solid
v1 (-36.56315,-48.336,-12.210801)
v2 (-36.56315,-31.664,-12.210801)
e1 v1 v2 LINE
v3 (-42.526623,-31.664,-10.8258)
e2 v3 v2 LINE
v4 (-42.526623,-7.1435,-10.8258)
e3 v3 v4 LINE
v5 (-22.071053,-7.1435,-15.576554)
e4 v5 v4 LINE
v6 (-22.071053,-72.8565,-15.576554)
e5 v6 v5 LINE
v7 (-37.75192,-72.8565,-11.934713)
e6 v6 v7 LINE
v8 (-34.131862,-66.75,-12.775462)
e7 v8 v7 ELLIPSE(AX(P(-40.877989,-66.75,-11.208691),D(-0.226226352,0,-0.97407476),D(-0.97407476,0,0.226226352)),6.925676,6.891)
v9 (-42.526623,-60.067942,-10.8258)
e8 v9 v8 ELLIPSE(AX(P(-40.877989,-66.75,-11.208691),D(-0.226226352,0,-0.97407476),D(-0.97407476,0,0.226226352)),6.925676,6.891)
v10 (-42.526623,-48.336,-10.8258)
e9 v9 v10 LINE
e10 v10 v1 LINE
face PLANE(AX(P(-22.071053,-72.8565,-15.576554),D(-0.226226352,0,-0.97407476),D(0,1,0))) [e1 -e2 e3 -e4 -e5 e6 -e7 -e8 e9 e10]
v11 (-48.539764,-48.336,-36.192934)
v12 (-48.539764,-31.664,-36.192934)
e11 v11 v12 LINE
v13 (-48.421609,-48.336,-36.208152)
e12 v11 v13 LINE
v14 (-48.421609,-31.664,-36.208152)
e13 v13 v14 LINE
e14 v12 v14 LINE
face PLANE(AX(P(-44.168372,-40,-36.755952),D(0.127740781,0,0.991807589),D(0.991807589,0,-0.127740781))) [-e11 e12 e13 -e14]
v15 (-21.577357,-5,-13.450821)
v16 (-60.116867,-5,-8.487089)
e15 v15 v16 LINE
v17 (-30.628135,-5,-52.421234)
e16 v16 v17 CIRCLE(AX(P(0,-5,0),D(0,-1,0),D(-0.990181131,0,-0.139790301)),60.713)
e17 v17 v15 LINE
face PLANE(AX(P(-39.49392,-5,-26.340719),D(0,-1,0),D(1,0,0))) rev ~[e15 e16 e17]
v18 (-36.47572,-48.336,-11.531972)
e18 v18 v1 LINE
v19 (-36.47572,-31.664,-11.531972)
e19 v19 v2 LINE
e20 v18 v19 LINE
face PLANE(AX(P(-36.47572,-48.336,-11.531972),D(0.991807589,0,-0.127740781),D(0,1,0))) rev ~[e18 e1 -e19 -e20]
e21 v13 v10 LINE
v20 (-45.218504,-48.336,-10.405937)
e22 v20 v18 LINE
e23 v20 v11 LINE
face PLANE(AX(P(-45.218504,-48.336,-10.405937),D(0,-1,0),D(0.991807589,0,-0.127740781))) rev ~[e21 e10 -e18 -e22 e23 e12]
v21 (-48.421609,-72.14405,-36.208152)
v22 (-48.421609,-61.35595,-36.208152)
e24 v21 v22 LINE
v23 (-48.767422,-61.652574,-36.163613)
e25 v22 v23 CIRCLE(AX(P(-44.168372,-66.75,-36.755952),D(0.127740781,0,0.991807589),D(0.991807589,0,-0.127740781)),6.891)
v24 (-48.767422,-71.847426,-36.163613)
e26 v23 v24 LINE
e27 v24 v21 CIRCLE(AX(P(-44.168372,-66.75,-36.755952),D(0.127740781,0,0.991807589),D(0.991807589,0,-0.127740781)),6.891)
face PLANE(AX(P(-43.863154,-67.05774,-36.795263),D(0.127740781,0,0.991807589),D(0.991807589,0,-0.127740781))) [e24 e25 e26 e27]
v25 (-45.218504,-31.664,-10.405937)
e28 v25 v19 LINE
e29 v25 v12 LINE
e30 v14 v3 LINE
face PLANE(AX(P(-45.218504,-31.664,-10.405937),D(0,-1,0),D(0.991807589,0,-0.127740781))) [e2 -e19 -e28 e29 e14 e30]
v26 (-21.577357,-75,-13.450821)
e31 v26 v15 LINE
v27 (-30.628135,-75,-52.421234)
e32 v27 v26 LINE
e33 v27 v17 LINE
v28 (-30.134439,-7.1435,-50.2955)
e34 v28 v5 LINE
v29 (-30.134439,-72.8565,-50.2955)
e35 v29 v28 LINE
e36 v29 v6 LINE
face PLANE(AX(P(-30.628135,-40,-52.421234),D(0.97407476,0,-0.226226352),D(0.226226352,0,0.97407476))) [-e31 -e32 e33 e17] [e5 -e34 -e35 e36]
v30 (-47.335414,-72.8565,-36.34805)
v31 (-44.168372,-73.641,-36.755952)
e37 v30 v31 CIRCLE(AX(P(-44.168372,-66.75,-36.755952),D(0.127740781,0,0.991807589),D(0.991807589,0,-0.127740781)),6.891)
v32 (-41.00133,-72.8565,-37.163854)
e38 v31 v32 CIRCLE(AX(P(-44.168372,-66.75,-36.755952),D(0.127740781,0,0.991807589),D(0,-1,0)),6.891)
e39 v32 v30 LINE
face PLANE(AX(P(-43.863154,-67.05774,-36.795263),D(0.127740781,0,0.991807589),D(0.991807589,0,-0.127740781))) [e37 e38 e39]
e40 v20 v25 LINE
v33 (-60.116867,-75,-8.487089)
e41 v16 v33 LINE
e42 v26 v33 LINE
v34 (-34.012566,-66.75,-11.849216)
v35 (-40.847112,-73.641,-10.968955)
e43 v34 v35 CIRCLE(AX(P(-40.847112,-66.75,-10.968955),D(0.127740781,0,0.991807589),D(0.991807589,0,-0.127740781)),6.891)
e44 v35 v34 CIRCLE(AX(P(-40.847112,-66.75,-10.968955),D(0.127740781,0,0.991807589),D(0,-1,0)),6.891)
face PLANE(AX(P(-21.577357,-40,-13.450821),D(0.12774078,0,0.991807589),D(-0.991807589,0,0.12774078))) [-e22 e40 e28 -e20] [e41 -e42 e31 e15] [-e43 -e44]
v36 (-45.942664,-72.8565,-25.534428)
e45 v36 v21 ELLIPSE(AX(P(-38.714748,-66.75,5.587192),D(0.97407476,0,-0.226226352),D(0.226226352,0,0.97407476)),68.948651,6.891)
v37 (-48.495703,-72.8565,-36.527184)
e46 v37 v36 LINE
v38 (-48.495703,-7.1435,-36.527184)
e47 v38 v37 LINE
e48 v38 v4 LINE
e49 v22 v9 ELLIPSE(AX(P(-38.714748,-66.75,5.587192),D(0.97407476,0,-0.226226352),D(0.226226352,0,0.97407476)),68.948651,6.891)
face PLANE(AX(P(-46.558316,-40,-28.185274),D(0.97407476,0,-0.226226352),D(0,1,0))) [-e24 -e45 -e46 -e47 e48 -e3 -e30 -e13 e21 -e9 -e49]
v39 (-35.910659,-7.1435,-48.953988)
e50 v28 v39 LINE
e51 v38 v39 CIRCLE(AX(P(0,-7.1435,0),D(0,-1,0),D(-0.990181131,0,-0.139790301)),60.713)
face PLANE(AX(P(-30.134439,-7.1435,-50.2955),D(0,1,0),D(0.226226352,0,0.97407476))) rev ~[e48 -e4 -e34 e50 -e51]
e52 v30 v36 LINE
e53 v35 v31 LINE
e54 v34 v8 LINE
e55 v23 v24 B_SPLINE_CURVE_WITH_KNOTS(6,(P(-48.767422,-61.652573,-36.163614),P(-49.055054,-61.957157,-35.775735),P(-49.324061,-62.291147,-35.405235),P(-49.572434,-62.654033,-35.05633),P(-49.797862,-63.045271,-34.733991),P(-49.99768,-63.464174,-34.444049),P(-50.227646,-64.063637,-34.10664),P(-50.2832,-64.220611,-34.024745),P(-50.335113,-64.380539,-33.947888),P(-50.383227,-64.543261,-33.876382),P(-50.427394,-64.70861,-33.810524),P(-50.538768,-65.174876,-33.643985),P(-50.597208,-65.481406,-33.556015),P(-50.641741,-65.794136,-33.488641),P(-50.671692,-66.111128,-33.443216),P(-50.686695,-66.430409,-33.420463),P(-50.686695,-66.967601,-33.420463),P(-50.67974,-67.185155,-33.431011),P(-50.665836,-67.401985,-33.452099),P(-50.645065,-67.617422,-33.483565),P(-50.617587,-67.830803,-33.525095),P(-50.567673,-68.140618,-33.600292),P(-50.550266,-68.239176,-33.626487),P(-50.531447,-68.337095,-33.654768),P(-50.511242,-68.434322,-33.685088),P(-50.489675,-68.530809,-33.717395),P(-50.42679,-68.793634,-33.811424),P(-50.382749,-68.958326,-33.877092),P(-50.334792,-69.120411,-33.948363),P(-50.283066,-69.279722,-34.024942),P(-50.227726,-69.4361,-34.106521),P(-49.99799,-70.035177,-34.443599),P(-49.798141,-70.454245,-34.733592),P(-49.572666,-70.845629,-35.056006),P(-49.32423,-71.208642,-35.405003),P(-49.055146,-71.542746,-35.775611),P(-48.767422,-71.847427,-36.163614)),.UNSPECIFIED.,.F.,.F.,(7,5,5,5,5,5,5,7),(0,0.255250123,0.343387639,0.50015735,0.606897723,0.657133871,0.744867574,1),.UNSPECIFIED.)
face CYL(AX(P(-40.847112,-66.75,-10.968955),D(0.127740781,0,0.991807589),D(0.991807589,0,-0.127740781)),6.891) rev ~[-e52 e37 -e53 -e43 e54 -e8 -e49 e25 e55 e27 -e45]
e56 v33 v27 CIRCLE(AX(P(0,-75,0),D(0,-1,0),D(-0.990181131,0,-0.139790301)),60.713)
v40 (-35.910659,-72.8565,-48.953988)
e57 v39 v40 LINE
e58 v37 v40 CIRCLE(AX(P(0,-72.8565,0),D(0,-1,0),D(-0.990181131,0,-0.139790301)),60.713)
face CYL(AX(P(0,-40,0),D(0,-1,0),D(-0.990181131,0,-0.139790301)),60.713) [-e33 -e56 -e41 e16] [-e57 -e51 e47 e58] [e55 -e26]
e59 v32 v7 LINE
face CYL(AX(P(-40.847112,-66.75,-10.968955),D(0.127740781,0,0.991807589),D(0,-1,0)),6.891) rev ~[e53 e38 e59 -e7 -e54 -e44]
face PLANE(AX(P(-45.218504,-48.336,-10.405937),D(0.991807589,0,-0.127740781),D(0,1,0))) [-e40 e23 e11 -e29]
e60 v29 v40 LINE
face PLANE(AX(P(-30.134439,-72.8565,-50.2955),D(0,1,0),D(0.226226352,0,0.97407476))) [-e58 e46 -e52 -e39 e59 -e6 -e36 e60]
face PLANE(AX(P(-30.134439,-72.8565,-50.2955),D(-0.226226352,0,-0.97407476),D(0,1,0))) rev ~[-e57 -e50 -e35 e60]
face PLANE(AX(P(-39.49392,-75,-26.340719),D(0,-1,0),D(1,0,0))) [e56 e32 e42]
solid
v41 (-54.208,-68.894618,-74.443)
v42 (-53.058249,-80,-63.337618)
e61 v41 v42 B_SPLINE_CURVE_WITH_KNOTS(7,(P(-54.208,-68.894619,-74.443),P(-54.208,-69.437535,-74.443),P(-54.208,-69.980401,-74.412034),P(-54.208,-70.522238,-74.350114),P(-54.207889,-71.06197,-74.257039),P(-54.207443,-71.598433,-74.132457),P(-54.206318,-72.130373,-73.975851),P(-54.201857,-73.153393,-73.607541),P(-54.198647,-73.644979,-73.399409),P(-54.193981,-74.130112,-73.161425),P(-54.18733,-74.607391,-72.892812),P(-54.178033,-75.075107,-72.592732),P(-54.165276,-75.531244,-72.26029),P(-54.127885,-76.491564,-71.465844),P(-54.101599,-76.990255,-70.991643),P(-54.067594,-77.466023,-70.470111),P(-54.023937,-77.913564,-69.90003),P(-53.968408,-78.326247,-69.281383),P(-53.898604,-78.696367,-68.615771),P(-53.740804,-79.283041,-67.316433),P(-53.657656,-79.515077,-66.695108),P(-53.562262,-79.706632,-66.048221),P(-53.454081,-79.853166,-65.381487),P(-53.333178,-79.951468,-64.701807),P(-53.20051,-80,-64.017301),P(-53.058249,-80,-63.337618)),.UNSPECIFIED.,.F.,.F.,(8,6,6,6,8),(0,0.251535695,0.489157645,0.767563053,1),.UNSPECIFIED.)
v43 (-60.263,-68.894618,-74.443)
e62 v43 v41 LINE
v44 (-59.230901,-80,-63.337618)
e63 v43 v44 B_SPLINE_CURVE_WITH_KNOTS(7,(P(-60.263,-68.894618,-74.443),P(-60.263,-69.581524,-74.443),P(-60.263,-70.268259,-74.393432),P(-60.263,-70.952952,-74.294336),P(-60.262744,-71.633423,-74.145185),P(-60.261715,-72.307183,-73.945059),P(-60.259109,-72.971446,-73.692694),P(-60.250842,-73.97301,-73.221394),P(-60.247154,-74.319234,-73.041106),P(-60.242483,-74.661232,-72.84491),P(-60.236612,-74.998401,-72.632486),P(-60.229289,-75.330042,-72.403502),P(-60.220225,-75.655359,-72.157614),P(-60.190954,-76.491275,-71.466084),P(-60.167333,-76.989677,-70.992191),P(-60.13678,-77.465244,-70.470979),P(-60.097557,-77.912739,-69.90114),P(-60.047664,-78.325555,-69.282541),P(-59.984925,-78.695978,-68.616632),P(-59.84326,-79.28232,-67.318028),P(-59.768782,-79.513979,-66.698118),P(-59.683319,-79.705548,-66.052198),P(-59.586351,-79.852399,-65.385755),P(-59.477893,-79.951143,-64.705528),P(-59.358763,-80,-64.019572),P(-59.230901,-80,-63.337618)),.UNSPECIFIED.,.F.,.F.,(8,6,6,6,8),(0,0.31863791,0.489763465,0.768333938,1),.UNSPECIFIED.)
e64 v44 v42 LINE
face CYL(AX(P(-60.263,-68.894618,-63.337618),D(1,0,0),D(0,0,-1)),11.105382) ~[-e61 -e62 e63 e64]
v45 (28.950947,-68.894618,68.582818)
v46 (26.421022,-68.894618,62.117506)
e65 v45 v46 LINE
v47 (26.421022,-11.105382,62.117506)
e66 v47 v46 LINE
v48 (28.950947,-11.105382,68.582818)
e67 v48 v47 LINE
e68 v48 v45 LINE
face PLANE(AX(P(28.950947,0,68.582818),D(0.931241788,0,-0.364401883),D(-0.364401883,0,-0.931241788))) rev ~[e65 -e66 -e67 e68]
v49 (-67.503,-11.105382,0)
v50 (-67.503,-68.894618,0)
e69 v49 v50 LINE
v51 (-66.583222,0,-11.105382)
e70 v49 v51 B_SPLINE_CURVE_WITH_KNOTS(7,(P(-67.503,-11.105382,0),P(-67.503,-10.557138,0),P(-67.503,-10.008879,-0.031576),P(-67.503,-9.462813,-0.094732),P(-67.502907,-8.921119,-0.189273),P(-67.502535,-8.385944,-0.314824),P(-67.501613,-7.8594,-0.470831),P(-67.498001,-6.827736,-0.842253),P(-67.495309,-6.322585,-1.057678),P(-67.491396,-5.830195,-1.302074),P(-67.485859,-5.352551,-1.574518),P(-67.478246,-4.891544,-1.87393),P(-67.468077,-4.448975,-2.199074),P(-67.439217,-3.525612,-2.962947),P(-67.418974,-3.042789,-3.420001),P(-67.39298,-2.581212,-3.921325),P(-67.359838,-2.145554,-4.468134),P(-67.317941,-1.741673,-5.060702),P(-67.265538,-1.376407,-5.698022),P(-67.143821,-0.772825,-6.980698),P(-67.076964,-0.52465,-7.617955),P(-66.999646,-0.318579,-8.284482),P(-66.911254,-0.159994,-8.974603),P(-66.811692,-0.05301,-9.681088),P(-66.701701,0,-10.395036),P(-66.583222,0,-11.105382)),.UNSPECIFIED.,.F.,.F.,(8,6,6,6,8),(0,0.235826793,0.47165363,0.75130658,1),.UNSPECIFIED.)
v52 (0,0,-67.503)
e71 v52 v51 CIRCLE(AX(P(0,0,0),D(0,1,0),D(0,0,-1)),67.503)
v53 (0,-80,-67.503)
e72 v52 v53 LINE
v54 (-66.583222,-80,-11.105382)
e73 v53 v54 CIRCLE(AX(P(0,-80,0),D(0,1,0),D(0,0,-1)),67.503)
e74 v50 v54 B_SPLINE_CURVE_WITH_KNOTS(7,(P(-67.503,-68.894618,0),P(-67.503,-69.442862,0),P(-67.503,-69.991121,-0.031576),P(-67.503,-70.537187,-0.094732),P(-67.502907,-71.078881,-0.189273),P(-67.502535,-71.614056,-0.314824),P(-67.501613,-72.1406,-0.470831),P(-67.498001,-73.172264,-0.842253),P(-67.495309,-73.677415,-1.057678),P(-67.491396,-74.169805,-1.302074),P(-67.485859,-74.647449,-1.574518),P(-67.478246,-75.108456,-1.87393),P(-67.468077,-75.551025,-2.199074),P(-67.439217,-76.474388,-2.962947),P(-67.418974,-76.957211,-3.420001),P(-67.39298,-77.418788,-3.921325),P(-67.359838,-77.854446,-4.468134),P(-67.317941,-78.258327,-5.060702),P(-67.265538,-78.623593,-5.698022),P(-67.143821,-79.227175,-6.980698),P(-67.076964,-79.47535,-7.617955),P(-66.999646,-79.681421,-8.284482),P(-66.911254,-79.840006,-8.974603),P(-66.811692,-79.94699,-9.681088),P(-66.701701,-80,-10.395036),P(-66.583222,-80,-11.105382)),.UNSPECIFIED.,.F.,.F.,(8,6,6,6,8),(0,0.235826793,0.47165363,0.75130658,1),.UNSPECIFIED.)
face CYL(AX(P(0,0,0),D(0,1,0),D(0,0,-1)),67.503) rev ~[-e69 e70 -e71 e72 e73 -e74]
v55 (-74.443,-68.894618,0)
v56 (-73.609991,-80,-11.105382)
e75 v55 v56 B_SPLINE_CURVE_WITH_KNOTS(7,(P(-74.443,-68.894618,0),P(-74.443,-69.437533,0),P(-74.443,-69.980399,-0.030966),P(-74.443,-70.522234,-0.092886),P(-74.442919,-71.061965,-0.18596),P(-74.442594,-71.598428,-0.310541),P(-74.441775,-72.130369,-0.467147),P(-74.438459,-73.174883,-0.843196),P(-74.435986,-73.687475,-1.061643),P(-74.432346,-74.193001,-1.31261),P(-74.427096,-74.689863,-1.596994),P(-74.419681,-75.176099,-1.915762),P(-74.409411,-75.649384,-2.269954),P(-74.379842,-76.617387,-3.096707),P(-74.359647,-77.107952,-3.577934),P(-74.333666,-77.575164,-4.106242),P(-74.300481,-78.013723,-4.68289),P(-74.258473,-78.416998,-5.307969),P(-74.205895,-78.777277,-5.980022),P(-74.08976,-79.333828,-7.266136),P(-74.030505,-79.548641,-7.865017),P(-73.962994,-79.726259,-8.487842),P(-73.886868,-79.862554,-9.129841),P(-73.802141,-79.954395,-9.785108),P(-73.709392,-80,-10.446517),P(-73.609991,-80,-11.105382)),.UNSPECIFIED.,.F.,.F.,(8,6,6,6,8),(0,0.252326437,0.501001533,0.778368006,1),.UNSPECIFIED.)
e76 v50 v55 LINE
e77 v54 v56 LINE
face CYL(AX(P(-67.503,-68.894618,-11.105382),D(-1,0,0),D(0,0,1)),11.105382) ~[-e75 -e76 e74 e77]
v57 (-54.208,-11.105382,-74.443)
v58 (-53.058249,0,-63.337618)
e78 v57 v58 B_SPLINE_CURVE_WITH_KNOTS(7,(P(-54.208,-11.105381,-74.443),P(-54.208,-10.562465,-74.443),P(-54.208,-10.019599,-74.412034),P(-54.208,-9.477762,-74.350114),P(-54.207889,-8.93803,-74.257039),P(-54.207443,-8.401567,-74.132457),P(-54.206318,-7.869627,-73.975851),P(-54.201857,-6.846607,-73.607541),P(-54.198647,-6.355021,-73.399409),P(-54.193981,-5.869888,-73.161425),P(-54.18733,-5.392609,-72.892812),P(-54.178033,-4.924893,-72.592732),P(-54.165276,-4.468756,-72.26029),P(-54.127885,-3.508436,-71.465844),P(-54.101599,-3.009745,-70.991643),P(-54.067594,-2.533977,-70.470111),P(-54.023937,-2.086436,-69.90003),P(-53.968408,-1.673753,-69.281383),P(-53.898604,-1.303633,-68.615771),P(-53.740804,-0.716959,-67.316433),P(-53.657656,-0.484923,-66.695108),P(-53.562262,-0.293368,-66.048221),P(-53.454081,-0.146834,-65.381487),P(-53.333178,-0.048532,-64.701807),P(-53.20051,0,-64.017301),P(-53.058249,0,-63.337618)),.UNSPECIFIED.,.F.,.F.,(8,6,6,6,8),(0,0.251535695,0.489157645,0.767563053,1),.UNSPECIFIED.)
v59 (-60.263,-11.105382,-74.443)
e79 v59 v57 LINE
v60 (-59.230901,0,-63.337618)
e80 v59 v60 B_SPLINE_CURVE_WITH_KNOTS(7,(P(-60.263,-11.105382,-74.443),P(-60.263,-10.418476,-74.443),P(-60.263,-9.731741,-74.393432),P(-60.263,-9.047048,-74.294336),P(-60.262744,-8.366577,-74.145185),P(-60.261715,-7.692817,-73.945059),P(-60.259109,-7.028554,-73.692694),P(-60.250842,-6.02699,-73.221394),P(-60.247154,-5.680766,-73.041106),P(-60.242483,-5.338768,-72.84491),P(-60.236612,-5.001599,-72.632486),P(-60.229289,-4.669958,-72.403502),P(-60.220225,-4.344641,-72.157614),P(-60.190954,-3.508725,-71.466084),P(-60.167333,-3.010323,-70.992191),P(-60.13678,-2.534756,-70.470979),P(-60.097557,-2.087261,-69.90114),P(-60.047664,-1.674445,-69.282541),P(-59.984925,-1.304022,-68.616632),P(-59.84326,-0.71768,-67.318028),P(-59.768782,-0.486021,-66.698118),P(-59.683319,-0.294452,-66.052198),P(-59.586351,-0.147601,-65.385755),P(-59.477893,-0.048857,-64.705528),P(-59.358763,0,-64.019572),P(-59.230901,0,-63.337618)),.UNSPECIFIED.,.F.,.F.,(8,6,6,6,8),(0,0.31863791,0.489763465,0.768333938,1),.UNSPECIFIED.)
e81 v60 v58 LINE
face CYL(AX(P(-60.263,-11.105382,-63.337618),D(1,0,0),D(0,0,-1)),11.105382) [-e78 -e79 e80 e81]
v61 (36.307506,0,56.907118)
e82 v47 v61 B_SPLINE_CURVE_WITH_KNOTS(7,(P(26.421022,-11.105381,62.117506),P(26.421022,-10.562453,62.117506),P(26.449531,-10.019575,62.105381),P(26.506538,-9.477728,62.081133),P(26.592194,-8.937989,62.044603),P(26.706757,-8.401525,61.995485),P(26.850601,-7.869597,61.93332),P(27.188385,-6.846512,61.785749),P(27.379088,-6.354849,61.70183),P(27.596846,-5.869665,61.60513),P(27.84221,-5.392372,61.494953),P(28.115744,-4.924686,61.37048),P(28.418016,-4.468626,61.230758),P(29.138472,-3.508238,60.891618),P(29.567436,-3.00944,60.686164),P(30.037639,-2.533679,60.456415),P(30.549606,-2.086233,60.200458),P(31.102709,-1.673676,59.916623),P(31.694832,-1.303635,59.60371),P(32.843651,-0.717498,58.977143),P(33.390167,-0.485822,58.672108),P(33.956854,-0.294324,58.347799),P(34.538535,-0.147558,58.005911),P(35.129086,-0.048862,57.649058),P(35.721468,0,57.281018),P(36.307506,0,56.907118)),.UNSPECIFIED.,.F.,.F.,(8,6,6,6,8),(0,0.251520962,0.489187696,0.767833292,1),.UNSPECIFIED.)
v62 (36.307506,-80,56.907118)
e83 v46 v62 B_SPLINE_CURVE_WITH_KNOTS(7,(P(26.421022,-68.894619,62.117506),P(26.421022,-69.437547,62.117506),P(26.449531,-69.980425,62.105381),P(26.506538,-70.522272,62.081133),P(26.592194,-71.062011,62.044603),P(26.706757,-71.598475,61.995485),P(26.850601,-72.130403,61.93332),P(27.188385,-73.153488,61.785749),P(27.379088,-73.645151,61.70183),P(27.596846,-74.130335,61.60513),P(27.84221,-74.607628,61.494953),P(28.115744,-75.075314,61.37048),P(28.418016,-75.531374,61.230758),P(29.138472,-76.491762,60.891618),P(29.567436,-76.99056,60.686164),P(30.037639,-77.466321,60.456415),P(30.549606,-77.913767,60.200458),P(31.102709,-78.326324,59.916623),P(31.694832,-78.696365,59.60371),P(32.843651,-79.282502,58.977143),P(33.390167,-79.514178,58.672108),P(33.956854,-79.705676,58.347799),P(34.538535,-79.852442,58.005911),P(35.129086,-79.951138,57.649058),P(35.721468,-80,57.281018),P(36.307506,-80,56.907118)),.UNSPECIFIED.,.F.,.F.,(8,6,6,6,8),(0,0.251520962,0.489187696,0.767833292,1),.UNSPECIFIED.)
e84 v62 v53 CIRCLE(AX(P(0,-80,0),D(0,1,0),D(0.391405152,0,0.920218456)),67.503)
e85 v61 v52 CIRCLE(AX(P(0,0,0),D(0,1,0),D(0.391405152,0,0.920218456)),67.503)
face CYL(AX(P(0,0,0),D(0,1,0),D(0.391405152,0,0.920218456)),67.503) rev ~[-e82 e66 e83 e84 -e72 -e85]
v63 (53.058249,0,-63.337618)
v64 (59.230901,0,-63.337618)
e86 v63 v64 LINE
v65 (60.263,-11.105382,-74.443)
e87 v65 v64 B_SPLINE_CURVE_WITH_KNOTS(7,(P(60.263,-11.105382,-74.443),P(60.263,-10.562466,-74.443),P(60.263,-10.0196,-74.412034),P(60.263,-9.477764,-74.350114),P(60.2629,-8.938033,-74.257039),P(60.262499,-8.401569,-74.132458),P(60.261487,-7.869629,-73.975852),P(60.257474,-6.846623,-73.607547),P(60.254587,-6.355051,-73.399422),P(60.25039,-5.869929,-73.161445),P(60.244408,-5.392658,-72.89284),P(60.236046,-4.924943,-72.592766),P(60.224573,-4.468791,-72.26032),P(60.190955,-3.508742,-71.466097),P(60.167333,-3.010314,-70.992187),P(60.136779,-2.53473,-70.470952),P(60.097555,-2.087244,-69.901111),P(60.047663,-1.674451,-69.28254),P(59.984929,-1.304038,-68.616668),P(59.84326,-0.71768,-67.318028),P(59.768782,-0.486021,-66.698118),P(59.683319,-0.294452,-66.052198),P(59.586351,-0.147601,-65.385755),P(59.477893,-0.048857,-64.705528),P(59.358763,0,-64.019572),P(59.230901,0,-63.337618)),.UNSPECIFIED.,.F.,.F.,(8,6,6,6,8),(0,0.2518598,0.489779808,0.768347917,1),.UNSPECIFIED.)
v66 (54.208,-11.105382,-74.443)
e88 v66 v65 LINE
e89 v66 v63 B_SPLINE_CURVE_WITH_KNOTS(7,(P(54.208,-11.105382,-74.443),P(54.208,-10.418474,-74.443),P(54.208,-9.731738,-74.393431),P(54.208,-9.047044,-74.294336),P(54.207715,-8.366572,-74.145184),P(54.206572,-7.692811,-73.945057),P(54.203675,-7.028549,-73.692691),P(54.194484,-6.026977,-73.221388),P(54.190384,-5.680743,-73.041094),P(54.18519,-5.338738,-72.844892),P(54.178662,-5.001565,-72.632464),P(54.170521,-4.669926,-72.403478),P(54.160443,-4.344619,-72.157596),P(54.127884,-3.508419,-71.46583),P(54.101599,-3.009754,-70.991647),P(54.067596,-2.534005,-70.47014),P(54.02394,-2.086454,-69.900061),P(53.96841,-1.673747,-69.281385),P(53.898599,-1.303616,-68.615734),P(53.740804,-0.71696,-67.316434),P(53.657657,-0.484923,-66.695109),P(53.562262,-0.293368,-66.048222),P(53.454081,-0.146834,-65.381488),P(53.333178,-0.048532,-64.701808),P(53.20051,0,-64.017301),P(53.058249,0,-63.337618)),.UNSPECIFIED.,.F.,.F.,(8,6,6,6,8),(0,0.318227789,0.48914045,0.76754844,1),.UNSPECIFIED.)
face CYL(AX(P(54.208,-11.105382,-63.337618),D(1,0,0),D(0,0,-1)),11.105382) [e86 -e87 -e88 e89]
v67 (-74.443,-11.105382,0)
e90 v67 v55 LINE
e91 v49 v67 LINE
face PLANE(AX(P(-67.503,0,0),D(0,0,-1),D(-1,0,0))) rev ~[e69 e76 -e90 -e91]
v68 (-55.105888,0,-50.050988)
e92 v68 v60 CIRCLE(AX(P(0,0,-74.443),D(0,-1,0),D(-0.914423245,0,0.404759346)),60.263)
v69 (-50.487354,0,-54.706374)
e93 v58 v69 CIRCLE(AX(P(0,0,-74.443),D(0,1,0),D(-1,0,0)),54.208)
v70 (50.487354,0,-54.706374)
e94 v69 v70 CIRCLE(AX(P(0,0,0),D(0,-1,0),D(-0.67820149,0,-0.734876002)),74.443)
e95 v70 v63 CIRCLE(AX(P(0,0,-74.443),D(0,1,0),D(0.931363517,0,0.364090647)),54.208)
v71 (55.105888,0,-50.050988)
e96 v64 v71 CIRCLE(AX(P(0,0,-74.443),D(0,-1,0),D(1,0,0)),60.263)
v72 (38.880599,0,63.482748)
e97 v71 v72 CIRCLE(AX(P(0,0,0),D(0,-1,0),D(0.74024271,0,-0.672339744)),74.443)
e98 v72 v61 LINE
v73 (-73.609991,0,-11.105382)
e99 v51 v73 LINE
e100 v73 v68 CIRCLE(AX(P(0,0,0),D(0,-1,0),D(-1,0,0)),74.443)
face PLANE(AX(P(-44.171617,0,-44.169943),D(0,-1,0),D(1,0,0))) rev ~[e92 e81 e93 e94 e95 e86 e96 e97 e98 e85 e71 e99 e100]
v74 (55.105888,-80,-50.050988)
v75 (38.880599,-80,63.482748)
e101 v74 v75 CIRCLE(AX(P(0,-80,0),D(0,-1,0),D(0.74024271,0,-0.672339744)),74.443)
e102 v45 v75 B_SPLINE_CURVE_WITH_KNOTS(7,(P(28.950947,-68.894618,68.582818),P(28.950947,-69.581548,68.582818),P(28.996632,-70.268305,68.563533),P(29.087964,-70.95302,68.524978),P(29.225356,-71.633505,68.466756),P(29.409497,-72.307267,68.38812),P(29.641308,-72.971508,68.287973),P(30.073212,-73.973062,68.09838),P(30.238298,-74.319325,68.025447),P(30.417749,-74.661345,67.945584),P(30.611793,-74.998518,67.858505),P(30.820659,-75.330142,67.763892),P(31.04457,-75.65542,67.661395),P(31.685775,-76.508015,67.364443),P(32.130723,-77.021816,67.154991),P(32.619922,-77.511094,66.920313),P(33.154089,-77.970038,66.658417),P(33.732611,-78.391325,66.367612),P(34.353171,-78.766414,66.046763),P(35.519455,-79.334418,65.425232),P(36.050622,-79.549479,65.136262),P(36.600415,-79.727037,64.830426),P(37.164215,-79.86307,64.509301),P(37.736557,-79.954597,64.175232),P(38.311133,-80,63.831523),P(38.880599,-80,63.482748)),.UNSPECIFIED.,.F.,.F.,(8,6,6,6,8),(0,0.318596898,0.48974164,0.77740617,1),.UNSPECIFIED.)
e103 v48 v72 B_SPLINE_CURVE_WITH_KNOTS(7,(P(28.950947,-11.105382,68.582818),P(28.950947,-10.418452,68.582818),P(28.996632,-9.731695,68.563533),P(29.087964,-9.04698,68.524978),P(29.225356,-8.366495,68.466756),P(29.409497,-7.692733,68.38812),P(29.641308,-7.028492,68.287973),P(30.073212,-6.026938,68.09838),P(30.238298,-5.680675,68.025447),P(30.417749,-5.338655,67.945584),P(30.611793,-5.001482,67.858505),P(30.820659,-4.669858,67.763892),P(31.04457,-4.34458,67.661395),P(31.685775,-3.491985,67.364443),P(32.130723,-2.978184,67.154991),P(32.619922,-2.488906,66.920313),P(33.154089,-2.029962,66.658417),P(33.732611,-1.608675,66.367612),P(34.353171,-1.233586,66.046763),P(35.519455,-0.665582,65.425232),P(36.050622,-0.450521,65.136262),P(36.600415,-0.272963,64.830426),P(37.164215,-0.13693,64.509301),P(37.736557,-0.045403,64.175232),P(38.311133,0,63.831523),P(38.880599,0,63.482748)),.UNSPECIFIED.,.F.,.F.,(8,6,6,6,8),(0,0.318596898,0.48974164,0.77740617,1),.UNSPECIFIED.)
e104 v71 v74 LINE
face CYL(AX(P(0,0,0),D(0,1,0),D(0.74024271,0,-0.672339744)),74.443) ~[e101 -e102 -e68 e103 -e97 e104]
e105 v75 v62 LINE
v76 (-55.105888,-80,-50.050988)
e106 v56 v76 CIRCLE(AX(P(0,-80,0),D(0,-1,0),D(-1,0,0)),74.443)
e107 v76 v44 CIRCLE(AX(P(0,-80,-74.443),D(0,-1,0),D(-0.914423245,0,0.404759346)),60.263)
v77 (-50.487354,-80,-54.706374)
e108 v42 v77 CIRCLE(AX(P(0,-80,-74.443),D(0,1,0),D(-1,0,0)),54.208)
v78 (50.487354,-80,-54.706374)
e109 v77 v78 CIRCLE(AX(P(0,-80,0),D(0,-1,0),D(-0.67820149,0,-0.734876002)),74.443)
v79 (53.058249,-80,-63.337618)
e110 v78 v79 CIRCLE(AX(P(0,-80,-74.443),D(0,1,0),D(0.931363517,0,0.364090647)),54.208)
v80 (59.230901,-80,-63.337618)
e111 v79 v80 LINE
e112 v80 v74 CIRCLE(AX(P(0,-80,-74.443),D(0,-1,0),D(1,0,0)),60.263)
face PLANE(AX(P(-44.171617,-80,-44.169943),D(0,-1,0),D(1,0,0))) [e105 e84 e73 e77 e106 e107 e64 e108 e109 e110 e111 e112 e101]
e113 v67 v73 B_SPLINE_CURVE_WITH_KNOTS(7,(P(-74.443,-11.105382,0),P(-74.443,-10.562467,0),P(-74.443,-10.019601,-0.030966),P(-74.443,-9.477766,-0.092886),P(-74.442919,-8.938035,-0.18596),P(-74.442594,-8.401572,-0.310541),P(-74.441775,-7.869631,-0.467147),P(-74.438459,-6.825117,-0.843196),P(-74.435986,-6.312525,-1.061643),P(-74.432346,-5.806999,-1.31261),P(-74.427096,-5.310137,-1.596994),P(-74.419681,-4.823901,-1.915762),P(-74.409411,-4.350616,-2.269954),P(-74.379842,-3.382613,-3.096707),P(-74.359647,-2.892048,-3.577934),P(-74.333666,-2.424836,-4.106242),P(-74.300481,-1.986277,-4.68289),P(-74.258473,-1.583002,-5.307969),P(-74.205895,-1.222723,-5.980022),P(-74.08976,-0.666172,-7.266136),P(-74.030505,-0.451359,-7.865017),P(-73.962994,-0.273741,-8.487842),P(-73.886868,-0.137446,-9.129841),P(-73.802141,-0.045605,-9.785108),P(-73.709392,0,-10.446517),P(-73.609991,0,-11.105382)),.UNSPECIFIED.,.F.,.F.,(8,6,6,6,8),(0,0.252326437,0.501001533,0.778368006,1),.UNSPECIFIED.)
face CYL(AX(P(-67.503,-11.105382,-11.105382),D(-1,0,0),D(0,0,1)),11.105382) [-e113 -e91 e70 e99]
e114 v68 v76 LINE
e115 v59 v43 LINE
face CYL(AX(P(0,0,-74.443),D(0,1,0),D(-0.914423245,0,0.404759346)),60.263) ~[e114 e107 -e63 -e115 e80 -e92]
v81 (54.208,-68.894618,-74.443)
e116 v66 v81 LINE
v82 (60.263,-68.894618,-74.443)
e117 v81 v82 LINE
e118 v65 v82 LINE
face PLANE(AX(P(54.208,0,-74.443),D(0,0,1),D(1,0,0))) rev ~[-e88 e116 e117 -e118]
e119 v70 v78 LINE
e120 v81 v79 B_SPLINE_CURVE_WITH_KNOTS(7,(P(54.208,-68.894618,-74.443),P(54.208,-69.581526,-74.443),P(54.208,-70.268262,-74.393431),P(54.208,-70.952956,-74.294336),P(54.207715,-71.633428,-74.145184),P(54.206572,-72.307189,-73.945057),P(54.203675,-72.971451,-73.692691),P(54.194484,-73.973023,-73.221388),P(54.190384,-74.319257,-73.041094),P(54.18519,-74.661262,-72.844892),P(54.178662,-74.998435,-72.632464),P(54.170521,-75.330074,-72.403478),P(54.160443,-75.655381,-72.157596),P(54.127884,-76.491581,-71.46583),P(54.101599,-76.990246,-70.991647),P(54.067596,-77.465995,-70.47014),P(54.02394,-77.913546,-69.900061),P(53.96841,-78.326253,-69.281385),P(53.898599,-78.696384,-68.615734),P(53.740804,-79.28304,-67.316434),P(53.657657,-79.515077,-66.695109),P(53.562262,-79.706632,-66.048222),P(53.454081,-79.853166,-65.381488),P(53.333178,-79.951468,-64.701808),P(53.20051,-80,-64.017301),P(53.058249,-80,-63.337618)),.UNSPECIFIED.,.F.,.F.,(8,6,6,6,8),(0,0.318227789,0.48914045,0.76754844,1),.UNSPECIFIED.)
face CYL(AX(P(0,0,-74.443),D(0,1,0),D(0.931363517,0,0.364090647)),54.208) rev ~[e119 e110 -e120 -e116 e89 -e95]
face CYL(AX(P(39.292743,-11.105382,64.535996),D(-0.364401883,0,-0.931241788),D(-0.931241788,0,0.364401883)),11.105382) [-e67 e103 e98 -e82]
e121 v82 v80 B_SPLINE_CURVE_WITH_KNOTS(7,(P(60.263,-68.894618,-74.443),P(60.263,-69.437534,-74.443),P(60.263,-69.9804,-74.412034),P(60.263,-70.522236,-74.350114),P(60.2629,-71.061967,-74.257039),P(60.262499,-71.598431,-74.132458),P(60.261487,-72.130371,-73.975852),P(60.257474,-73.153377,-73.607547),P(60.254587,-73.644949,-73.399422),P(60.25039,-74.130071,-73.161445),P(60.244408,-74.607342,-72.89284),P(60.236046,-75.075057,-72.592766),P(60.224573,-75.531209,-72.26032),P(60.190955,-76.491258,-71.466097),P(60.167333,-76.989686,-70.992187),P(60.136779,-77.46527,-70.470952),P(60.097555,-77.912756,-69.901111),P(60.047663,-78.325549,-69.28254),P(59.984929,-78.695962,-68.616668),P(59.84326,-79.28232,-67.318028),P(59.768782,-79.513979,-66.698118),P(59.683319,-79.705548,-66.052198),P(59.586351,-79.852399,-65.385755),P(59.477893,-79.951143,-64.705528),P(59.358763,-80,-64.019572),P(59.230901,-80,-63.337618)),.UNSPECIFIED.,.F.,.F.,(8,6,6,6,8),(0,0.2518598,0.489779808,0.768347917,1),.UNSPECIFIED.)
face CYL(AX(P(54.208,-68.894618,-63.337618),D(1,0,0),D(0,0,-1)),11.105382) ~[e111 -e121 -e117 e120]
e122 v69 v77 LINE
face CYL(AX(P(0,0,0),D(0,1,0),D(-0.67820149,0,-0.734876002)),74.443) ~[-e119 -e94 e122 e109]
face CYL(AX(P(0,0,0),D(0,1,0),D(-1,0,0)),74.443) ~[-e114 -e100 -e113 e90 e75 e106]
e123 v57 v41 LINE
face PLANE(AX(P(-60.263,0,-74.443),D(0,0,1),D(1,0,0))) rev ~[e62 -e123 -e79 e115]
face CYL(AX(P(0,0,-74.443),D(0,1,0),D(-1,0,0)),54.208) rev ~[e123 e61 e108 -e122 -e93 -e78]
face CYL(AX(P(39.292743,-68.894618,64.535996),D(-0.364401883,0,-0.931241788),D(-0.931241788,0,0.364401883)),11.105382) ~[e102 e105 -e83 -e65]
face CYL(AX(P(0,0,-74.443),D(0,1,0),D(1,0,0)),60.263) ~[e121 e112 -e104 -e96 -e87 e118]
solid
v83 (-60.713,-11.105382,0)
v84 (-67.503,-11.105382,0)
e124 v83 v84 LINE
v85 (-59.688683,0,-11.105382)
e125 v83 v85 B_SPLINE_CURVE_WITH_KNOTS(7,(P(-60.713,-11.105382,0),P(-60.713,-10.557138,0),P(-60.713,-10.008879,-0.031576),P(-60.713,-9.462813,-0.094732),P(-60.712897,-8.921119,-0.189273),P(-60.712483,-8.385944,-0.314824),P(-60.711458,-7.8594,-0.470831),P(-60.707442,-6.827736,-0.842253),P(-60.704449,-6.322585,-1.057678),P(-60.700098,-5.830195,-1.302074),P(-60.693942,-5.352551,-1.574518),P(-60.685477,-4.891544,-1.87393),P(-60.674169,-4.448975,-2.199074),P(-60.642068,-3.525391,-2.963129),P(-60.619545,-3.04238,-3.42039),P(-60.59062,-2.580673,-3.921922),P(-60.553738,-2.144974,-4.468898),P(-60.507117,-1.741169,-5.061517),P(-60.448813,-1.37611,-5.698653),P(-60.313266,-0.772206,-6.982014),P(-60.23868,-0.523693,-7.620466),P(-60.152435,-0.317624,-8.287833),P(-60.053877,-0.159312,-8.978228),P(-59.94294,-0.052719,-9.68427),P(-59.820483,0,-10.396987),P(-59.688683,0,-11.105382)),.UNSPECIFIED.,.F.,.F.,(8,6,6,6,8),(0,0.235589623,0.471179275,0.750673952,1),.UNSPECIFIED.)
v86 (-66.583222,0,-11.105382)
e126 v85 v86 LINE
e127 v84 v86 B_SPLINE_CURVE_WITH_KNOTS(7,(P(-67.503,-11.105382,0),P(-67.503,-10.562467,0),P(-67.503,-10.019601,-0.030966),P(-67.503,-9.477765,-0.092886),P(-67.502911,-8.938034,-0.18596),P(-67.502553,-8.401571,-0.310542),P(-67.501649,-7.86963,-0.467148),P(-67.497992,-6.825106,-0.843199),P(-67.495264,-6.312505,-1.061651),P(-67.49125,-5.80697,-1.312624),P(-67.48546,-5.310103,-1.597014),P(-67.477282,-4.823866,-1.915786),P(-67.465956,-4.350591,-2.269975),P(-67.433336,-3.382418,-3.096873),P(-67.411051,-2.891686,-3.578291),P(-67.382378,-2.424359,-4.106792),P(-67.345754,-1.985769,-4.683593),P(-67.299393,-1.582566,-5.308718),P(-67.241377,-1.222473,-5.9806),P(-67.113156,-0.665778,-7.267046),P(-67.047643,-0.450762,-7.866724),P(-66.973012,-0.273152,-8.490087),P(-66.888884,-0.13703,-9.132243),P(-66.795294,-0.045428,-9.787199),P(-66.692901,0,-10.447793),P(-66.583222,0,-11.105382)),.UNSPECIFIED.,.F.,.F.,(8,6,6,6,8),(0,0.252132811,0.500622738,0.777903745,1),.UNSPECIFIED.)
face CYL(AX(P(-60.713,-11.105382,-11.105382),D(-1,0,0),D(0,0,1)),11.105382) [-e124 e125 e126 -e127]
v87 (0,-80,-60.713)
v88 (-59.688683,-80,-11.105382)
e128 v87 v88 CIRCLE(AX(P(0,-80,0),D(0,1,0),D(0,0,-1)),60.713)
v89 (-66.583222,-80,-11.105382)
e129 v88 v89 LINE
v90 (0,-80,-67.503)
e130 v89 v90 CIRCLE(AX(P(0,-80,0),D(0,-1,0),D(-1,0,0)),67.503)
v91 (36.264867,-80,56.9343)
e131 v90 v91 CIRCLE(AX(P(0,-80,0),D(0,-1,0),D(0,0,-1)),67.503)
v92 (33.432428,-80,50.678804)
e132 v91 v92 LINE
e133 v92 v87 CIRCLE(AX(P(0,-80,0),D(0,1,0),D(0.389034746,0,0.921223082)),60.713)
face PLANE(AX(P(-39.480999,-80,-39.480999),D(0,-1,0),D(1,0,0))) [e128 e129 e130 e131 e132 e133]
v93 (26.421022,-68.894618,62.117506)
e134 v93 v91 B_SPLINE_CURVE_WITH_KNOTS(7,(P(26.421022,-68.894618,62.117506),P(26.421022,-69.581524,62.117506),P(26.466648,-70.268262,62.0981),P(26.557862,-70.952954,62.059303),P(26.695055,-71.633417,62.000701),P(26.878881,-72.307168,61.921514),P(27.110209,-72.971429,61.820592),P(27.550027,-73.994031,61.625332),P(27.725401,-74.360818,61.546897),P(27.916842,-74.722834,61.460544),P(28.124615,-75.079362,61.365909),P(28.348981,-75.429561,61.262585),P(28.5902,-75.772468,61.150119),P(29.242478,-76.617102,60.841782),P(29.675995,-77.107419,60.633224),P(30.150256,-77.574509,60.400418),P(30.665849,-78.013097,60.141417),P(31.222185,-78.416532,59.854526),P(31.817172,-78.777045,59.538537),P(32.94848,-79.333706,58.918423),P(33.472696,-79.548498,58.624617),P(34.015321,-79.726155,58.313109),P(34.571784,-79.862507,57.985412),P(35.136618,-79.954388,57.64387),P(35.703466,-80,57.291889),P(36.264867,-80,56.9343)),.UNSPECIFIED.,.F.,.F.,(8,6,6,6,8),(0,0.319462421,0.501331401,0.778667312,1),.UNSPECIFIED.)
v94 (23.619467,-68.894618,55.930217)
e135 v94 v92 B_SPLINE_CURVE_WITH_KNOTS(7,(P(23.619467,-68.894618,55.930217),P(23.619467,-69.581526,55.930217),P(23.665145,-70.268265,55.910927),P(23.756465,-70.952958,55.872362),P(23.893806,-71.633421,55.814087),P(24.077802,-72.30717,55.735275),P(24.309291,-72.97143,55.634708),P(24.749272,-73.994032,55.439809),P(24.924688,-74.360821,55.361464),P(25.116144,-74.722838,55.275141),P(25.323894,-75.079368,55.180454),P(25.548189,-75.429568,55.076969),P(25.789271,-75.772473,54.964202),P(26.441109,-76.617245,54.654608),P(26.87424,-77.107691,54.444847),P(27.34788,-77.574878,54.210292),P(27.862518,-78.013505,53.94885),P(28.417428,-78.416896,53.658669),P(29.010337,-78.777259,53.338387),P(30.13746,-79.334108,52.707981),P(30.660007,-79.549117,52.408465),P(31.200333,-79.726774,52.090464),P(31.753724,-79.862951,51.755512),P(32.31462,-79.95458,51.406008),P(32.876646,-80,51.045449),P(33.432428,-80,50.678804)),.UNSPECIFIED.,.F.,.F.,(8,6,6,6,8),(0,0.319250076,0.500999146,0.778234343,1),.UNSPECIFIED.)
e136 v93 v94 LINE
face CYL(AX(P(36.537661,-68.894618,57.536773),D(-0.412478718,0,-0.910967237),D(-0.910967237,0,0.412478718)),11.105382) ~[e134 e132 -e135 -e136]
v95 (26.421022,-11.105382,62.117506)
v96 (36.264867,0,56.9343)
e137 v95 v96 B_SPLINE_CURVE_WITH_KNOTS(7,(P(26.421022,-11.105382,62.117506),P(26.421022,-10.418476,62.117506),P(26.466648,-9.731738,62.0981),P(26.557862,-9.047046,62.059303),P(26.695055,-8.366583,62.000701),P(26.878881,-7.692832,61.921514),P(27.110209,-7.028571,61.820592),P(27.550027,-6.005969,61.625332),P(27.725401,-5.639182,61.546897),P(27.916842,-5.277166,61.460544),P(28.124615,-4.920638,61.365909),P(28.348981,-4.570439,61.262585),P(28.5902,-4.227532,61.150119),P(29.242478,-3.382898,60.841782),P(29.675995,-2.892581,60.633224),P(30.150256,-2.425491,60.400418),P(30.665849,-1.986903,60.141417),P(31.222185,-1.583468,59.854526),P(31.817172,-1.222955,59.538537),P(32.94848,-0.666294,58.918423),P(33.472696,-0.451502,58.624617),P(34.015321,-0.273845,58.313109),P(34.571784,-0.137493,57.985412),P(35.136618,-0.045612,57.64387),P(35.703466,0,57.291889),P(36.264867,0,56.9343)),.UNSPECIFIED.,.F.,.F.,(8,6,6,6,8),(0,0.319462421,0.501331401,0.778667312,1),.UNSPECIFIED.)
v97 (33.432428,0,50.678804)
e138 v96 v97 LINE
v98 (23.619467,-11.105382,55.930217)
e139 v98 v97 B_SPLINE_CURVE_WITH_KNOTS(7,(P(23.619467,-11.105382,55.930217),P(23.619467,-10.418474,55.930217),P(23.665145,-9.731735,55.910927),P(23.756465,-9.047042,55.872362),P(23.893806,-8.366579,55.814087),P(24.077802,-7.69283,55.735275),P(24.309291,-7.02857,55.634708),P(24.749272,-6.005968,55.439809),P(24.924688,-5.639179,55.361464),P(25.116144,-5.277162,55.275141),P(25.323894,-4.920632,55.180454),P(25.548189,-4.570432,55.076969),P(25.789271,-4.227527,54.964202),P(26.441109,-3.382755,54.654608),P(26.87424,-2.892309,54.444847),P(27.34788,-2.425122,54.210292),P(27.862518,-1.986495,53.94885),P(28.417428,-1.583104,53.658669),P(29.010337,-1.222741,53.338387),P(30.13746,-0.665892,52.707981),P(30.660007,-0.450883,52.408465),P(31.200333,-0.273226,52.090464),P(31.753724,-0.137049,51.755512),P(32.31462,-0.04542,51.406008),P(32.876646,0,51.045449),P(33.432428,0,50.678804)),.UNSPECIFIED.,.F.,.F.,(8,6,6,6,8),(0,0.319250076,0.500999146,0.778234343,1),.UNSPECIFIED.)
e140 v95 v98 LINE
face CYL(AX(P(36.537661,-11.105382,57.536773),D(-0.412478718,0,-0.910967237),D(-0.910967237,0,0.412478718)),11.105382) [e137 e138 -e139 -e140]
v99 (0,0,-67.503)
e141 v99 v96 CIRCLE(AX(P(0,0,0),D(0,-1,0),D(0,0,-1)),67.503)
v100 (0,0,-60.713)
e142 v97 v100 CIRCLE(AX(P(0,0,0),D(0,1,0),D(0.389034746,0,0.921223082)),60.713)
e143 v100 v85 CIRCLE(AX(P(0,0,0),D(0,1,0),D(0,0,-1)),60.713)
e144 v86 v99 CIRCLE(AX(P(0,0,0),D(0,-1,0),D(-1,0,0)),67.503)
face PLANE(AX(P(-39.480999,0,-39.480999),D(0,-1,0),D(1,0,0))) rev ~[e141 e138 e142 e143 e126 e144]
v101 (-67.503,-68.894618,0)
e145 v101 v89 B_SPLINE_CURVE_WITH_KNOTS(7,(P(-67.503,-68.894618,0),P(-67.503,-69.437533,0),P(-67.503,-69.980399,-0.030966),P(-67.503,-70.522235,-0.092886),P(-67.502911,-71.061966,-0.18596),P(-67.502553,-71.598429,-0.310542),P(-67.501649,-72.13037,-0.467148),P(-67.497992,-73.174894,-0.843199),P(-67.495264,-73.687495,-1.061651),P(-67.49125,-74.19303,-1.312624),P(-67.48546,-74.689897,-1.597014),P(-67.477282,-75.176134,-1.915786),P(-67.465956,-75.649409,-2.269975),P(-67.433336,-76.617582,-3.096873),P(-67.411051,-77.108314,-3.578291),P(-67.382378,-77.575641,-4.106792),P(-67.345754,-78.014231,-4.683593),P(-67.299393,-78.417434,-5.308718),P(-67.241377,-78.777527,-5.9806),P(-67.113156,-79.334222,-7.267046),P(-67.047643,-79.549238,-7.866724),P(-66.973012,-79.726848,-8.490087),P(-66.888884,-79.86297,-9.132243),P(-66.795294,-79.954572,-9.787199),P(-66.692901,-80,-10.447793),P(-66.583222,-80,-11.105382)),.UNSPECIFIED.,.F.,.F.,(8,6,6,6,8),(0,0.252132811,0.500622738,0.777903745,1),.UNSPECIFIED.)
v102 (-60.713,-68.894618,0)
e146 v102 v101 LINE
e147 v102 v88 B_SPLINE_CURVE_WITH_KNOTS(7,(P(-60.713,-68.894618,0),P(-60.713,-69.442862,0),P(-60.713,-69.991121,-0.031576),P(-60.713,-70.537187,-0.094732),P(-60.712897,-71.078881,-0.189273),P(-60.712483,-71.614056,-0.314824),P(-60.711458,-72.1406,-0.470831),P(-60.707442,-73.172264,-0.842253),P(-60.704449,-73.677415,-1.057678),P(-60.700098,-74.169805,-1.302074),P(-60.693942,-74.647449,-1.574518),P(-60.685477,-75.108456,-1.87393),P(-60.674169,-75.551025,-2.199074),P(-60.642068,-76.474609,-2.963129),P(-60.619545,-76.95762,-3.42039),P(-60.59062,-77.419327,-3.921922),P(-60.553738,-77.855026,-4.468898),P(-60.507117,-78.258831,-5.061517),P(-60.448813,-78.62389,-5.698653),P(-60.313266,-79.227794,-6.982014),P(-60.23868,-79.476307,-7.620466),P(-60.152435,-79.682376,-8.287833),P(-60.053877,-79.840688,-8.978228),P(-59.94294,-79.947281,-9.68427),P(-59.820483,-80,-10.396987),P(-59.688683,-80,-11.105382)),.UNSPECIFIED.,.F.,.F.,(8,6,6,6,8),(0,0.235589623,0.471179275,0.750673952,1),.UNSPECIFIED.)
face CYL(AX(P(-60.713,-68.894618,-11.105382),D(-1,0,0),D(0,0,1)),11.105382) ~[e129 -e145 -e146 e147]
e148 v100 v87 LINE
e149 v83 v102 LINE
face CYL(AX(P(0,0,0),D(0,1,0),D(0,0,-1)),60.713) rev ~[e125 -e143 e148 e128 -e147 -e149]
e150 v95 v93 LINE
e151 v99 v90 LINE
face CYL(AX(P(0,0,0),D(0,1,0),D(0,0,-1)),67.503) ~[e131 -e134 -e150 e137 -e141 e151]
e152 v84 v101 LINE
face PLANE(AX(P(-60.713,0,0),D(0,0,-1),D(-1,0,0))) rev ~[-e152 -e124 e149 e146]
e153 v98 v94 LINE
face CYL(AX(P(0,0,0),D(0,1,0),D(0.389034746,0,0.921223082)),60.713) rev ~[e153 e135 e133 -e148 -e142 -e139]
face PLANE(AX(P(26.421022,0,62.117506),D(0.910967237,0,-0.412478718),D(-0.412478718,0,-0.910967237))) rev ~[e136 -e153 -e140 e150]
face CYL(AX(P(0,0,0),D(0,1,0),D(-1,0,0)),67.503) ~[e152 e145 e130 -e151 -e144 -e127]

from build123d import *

# Parameters (mm, degrees)
F1_DEPTH      = 80
F2_DEPTH      = 80
F3_R          = 11.1053823869
F3_2_R        = 11.1053823869
F6_DEPTH      = 35
F6_DEPTH_BACK = 35
F8_DEPTH      = 26
F7_W          = 8.815
F7_H          = 16.672
F9_DEPTH      = 26
F10_W         = 65.713
F10_H         = 35.643
F11_DEPTH     = 21


with BuildPart() as f1:
    # F0 (on Front) → F1 (new body)
    with BuildSketch(Plane.XZ):
        with BuildLine():
            Line((0, -67.503), (0, -60.713))
            ThreePointArc((0, -60.713), (-42.9305740062, -42.9305740062), (-60.713, 0))
            Line((-60.713, 0), (-67.503, 0))
            ThreePointArc((-67.503, 0), (-47.7318290504, -47.7318290504), (0, -67.503))
        make_face()
        with BuildLine():
            Line((26.4210219705, 62.1175064457), (23.6194665166, 55.9302169714))
            ThreePointArc((23.6194665166, 55.9302169714), (59.505292336, -12.0494212727), (0, -60.713))
            Line((0, -60.713), (0, -67.503))
            ThreePointArc((0, -67.503), (66.1429249678, -13.4821543419), (26.4210219705, 62.1175064457))
        make_face()
    extrude(amount=F1_DEPTH)

    # F3
    f3_edges = [f1.edges().sort_by_distance(p)[0] for p in [
        (-64.108, -80, 0),
        (-64.108, 0, 0),
        (25.020244, -80, 59.023862),
        (25.020244, 0, 59.023862),
    ]]
    fillet(f3_edges, radius=F3_R)


with BuildPart() as f2:
    # F0 (on Front) → F2 (new body)
    with BuildSketch(Plane.XZ):
        with BuildLine():
            Line((0, -74.443), (0, -67.503))
            ThreePointArc((0, -67.503), (-47.7318290504, -47.7318290504), (-67.503, 0))
            Line((-67.503, 0), (-74.443, 0))
            ThreePointArc((-74.443, 0), (-69.4406504587, -26.8282745041), (-55.1058880387, -50.0509875274))
            ThreePointArc((-55.1058880387, -50.0509875274), (-52.8479074613, -52.4295615656), (-50.4873535385, -54.7063742326))
            ThreePointArc((-50.4873535385, -54.7063742326), (-27.104, -69.3334943083), (0, -74.443))
        make_face()
        with BuildLine():
            Line((28.9509467911, 68.5828180297), (26.4210219705, 62.1175064457))
            ThreePointArc((26.4210219705, 62.1175064457), (66.1429249678, -13.4821543419), (0, -67.503))
            Line((0, -67.503), (0, -74.443))
            ThreePointArc((0, -74.443), (27.104, -69.3334943083), (50.4873535385, -54.7063742326))
            ThreePointArc((50.4873535385, -54.7063742326), (52.8479074613, -52.4295615656), (55.1058880387, -50.0509875274))
            ThreePointArc((55.1058880387, -50.0509875274), (72.6971995722, 16.0273960255), (28.9509467911, 68.5828180297))
        make_face()
        with BuildLine():
            ThreePointArc((-54.208, -74.443), (-53.2697180611, -64.4008686678), (-50.4873535385, -54.7063742326))
            ThreePointArc((-50.4873535385, -54.7063742326), (-52.8479074613, -52.4295615656), (-55.1058880387, -50.0509875274))
            ThreePointArc((-55.1058880387, -50.0509875274), (-58.959627288, -61.9773865349), (-60.263, -74.443))
            Line((-60.263, -74.443), (-54.208, -74.443))
        make_face()
        with BuildLine():
            ThreePointArc((60.263, -74.443), (58.959627288, -61.9773865349), (55.1058880387, -50.0509875274))
            ThreePointArc((55.1058880387, -50.0509875274), (52.8479074613, -52.4295615656), (50.4873535385, -54.7063742326))
            ThreePointArc((50.4873535385, -54.7063742326), (53.2697180611, -64.4008686678), (54.208, -74.443))
            Line((54.208, -74.443), (60.263, -74.443))
        make_face()
    extrude(amount=F2_DEPTH)

    # F3#2
    f3_2_edges = [f2.edges().sort_by_distance(p)[0] for p in [
        (-70.973, -80, 0),
        (-70.973, 0, 0),
        (27.685984, -80, 65.350162),
        (27.685984, 0, 65.350162),
        (-57.2355, -80, -74.443),
        (-57.2355, 0, -74.443),
        (57.2355, -80, -74.443),
        (57.2355, 0, -74.443),
    ]]
    fillet(f3_2_edges, radius=F3_2_R)


with BuildPart() as f6:
    # F5 (on offset) → F6 (new body, two sides)
    with BuildSketch(Plane.XZ.offset(40)) as f6_sk:
        with BuildLine():
            Line((-21.5773568214, -13.4508206014), (-60.1168669908, -8.4870885591))
            ThreePointArc((-60.1168669908, -8.4870885591), (-50.4104761962, -33.8356654829), (-30.6281347583, -52.4212335817))
            Line((-30.6281347583, -52.4212335817), (-21.5773568214, -13.4508206014))
        make_face()
    extrude(amount=F6_DEPTH)
    extrude(f6_sk.sketch, amount=-F6_DEPTH_BACK)

    # F7 (on face) → F8 (cut)
    with BuildSketch(Plane(origin=(-2.0562349566, 0, -15.9650616406), x_dir=(0.9918075887, 0, -0.1277407805), z_dir=(0.1277407805, 0, 0.9918075887))):
        with BuildLine():
            ThreePointArc((-32.2202927461, -66.75), (-43.9839655752, -61.8773271708), (-39.1112927461, -73.641))
            ThreePointArc((-39.1112927461, -73.641), (-34.2386199169, -71.6226728292), (-32.2202927461, -66.75))
        make_face()
    extrude(amount=-F8_DEPTH, mode=Mode.SUBTRACT)

    # F7 (on face) → F9 (cut)
    with BuildSketch(Plane(origin=(-2.0562349566, 0, -15.9650616406), x_dir=(0.9918075887, 0, -0.1277407805), z_dir=(0.1277407805, 0, 0.9918075887))):
        with Locations((-39.1112927461, -40)):
            Rectangle(F7_W, F7_H)
    extrude(amount=-F9_DEPTH, mode=Mode.SUBTRACT)

    # F10 (on face) → F11 (cut)
    with BuildSketch(Plane(origin=(-17.5090216634, 0, 4.0664251377), x_dir=(0, 1, 0), z_dir=(0.9740747599, 0, -0.2262263515))):
        with Locations((-40, -37.987281626)):
            Rectangle(F10_W, F10_H)
    extrude(amount=-F11_DEPTH, mode=Mode.SUBTRACT)


solid = Compound([f1.part, f2.part, f6.part])
